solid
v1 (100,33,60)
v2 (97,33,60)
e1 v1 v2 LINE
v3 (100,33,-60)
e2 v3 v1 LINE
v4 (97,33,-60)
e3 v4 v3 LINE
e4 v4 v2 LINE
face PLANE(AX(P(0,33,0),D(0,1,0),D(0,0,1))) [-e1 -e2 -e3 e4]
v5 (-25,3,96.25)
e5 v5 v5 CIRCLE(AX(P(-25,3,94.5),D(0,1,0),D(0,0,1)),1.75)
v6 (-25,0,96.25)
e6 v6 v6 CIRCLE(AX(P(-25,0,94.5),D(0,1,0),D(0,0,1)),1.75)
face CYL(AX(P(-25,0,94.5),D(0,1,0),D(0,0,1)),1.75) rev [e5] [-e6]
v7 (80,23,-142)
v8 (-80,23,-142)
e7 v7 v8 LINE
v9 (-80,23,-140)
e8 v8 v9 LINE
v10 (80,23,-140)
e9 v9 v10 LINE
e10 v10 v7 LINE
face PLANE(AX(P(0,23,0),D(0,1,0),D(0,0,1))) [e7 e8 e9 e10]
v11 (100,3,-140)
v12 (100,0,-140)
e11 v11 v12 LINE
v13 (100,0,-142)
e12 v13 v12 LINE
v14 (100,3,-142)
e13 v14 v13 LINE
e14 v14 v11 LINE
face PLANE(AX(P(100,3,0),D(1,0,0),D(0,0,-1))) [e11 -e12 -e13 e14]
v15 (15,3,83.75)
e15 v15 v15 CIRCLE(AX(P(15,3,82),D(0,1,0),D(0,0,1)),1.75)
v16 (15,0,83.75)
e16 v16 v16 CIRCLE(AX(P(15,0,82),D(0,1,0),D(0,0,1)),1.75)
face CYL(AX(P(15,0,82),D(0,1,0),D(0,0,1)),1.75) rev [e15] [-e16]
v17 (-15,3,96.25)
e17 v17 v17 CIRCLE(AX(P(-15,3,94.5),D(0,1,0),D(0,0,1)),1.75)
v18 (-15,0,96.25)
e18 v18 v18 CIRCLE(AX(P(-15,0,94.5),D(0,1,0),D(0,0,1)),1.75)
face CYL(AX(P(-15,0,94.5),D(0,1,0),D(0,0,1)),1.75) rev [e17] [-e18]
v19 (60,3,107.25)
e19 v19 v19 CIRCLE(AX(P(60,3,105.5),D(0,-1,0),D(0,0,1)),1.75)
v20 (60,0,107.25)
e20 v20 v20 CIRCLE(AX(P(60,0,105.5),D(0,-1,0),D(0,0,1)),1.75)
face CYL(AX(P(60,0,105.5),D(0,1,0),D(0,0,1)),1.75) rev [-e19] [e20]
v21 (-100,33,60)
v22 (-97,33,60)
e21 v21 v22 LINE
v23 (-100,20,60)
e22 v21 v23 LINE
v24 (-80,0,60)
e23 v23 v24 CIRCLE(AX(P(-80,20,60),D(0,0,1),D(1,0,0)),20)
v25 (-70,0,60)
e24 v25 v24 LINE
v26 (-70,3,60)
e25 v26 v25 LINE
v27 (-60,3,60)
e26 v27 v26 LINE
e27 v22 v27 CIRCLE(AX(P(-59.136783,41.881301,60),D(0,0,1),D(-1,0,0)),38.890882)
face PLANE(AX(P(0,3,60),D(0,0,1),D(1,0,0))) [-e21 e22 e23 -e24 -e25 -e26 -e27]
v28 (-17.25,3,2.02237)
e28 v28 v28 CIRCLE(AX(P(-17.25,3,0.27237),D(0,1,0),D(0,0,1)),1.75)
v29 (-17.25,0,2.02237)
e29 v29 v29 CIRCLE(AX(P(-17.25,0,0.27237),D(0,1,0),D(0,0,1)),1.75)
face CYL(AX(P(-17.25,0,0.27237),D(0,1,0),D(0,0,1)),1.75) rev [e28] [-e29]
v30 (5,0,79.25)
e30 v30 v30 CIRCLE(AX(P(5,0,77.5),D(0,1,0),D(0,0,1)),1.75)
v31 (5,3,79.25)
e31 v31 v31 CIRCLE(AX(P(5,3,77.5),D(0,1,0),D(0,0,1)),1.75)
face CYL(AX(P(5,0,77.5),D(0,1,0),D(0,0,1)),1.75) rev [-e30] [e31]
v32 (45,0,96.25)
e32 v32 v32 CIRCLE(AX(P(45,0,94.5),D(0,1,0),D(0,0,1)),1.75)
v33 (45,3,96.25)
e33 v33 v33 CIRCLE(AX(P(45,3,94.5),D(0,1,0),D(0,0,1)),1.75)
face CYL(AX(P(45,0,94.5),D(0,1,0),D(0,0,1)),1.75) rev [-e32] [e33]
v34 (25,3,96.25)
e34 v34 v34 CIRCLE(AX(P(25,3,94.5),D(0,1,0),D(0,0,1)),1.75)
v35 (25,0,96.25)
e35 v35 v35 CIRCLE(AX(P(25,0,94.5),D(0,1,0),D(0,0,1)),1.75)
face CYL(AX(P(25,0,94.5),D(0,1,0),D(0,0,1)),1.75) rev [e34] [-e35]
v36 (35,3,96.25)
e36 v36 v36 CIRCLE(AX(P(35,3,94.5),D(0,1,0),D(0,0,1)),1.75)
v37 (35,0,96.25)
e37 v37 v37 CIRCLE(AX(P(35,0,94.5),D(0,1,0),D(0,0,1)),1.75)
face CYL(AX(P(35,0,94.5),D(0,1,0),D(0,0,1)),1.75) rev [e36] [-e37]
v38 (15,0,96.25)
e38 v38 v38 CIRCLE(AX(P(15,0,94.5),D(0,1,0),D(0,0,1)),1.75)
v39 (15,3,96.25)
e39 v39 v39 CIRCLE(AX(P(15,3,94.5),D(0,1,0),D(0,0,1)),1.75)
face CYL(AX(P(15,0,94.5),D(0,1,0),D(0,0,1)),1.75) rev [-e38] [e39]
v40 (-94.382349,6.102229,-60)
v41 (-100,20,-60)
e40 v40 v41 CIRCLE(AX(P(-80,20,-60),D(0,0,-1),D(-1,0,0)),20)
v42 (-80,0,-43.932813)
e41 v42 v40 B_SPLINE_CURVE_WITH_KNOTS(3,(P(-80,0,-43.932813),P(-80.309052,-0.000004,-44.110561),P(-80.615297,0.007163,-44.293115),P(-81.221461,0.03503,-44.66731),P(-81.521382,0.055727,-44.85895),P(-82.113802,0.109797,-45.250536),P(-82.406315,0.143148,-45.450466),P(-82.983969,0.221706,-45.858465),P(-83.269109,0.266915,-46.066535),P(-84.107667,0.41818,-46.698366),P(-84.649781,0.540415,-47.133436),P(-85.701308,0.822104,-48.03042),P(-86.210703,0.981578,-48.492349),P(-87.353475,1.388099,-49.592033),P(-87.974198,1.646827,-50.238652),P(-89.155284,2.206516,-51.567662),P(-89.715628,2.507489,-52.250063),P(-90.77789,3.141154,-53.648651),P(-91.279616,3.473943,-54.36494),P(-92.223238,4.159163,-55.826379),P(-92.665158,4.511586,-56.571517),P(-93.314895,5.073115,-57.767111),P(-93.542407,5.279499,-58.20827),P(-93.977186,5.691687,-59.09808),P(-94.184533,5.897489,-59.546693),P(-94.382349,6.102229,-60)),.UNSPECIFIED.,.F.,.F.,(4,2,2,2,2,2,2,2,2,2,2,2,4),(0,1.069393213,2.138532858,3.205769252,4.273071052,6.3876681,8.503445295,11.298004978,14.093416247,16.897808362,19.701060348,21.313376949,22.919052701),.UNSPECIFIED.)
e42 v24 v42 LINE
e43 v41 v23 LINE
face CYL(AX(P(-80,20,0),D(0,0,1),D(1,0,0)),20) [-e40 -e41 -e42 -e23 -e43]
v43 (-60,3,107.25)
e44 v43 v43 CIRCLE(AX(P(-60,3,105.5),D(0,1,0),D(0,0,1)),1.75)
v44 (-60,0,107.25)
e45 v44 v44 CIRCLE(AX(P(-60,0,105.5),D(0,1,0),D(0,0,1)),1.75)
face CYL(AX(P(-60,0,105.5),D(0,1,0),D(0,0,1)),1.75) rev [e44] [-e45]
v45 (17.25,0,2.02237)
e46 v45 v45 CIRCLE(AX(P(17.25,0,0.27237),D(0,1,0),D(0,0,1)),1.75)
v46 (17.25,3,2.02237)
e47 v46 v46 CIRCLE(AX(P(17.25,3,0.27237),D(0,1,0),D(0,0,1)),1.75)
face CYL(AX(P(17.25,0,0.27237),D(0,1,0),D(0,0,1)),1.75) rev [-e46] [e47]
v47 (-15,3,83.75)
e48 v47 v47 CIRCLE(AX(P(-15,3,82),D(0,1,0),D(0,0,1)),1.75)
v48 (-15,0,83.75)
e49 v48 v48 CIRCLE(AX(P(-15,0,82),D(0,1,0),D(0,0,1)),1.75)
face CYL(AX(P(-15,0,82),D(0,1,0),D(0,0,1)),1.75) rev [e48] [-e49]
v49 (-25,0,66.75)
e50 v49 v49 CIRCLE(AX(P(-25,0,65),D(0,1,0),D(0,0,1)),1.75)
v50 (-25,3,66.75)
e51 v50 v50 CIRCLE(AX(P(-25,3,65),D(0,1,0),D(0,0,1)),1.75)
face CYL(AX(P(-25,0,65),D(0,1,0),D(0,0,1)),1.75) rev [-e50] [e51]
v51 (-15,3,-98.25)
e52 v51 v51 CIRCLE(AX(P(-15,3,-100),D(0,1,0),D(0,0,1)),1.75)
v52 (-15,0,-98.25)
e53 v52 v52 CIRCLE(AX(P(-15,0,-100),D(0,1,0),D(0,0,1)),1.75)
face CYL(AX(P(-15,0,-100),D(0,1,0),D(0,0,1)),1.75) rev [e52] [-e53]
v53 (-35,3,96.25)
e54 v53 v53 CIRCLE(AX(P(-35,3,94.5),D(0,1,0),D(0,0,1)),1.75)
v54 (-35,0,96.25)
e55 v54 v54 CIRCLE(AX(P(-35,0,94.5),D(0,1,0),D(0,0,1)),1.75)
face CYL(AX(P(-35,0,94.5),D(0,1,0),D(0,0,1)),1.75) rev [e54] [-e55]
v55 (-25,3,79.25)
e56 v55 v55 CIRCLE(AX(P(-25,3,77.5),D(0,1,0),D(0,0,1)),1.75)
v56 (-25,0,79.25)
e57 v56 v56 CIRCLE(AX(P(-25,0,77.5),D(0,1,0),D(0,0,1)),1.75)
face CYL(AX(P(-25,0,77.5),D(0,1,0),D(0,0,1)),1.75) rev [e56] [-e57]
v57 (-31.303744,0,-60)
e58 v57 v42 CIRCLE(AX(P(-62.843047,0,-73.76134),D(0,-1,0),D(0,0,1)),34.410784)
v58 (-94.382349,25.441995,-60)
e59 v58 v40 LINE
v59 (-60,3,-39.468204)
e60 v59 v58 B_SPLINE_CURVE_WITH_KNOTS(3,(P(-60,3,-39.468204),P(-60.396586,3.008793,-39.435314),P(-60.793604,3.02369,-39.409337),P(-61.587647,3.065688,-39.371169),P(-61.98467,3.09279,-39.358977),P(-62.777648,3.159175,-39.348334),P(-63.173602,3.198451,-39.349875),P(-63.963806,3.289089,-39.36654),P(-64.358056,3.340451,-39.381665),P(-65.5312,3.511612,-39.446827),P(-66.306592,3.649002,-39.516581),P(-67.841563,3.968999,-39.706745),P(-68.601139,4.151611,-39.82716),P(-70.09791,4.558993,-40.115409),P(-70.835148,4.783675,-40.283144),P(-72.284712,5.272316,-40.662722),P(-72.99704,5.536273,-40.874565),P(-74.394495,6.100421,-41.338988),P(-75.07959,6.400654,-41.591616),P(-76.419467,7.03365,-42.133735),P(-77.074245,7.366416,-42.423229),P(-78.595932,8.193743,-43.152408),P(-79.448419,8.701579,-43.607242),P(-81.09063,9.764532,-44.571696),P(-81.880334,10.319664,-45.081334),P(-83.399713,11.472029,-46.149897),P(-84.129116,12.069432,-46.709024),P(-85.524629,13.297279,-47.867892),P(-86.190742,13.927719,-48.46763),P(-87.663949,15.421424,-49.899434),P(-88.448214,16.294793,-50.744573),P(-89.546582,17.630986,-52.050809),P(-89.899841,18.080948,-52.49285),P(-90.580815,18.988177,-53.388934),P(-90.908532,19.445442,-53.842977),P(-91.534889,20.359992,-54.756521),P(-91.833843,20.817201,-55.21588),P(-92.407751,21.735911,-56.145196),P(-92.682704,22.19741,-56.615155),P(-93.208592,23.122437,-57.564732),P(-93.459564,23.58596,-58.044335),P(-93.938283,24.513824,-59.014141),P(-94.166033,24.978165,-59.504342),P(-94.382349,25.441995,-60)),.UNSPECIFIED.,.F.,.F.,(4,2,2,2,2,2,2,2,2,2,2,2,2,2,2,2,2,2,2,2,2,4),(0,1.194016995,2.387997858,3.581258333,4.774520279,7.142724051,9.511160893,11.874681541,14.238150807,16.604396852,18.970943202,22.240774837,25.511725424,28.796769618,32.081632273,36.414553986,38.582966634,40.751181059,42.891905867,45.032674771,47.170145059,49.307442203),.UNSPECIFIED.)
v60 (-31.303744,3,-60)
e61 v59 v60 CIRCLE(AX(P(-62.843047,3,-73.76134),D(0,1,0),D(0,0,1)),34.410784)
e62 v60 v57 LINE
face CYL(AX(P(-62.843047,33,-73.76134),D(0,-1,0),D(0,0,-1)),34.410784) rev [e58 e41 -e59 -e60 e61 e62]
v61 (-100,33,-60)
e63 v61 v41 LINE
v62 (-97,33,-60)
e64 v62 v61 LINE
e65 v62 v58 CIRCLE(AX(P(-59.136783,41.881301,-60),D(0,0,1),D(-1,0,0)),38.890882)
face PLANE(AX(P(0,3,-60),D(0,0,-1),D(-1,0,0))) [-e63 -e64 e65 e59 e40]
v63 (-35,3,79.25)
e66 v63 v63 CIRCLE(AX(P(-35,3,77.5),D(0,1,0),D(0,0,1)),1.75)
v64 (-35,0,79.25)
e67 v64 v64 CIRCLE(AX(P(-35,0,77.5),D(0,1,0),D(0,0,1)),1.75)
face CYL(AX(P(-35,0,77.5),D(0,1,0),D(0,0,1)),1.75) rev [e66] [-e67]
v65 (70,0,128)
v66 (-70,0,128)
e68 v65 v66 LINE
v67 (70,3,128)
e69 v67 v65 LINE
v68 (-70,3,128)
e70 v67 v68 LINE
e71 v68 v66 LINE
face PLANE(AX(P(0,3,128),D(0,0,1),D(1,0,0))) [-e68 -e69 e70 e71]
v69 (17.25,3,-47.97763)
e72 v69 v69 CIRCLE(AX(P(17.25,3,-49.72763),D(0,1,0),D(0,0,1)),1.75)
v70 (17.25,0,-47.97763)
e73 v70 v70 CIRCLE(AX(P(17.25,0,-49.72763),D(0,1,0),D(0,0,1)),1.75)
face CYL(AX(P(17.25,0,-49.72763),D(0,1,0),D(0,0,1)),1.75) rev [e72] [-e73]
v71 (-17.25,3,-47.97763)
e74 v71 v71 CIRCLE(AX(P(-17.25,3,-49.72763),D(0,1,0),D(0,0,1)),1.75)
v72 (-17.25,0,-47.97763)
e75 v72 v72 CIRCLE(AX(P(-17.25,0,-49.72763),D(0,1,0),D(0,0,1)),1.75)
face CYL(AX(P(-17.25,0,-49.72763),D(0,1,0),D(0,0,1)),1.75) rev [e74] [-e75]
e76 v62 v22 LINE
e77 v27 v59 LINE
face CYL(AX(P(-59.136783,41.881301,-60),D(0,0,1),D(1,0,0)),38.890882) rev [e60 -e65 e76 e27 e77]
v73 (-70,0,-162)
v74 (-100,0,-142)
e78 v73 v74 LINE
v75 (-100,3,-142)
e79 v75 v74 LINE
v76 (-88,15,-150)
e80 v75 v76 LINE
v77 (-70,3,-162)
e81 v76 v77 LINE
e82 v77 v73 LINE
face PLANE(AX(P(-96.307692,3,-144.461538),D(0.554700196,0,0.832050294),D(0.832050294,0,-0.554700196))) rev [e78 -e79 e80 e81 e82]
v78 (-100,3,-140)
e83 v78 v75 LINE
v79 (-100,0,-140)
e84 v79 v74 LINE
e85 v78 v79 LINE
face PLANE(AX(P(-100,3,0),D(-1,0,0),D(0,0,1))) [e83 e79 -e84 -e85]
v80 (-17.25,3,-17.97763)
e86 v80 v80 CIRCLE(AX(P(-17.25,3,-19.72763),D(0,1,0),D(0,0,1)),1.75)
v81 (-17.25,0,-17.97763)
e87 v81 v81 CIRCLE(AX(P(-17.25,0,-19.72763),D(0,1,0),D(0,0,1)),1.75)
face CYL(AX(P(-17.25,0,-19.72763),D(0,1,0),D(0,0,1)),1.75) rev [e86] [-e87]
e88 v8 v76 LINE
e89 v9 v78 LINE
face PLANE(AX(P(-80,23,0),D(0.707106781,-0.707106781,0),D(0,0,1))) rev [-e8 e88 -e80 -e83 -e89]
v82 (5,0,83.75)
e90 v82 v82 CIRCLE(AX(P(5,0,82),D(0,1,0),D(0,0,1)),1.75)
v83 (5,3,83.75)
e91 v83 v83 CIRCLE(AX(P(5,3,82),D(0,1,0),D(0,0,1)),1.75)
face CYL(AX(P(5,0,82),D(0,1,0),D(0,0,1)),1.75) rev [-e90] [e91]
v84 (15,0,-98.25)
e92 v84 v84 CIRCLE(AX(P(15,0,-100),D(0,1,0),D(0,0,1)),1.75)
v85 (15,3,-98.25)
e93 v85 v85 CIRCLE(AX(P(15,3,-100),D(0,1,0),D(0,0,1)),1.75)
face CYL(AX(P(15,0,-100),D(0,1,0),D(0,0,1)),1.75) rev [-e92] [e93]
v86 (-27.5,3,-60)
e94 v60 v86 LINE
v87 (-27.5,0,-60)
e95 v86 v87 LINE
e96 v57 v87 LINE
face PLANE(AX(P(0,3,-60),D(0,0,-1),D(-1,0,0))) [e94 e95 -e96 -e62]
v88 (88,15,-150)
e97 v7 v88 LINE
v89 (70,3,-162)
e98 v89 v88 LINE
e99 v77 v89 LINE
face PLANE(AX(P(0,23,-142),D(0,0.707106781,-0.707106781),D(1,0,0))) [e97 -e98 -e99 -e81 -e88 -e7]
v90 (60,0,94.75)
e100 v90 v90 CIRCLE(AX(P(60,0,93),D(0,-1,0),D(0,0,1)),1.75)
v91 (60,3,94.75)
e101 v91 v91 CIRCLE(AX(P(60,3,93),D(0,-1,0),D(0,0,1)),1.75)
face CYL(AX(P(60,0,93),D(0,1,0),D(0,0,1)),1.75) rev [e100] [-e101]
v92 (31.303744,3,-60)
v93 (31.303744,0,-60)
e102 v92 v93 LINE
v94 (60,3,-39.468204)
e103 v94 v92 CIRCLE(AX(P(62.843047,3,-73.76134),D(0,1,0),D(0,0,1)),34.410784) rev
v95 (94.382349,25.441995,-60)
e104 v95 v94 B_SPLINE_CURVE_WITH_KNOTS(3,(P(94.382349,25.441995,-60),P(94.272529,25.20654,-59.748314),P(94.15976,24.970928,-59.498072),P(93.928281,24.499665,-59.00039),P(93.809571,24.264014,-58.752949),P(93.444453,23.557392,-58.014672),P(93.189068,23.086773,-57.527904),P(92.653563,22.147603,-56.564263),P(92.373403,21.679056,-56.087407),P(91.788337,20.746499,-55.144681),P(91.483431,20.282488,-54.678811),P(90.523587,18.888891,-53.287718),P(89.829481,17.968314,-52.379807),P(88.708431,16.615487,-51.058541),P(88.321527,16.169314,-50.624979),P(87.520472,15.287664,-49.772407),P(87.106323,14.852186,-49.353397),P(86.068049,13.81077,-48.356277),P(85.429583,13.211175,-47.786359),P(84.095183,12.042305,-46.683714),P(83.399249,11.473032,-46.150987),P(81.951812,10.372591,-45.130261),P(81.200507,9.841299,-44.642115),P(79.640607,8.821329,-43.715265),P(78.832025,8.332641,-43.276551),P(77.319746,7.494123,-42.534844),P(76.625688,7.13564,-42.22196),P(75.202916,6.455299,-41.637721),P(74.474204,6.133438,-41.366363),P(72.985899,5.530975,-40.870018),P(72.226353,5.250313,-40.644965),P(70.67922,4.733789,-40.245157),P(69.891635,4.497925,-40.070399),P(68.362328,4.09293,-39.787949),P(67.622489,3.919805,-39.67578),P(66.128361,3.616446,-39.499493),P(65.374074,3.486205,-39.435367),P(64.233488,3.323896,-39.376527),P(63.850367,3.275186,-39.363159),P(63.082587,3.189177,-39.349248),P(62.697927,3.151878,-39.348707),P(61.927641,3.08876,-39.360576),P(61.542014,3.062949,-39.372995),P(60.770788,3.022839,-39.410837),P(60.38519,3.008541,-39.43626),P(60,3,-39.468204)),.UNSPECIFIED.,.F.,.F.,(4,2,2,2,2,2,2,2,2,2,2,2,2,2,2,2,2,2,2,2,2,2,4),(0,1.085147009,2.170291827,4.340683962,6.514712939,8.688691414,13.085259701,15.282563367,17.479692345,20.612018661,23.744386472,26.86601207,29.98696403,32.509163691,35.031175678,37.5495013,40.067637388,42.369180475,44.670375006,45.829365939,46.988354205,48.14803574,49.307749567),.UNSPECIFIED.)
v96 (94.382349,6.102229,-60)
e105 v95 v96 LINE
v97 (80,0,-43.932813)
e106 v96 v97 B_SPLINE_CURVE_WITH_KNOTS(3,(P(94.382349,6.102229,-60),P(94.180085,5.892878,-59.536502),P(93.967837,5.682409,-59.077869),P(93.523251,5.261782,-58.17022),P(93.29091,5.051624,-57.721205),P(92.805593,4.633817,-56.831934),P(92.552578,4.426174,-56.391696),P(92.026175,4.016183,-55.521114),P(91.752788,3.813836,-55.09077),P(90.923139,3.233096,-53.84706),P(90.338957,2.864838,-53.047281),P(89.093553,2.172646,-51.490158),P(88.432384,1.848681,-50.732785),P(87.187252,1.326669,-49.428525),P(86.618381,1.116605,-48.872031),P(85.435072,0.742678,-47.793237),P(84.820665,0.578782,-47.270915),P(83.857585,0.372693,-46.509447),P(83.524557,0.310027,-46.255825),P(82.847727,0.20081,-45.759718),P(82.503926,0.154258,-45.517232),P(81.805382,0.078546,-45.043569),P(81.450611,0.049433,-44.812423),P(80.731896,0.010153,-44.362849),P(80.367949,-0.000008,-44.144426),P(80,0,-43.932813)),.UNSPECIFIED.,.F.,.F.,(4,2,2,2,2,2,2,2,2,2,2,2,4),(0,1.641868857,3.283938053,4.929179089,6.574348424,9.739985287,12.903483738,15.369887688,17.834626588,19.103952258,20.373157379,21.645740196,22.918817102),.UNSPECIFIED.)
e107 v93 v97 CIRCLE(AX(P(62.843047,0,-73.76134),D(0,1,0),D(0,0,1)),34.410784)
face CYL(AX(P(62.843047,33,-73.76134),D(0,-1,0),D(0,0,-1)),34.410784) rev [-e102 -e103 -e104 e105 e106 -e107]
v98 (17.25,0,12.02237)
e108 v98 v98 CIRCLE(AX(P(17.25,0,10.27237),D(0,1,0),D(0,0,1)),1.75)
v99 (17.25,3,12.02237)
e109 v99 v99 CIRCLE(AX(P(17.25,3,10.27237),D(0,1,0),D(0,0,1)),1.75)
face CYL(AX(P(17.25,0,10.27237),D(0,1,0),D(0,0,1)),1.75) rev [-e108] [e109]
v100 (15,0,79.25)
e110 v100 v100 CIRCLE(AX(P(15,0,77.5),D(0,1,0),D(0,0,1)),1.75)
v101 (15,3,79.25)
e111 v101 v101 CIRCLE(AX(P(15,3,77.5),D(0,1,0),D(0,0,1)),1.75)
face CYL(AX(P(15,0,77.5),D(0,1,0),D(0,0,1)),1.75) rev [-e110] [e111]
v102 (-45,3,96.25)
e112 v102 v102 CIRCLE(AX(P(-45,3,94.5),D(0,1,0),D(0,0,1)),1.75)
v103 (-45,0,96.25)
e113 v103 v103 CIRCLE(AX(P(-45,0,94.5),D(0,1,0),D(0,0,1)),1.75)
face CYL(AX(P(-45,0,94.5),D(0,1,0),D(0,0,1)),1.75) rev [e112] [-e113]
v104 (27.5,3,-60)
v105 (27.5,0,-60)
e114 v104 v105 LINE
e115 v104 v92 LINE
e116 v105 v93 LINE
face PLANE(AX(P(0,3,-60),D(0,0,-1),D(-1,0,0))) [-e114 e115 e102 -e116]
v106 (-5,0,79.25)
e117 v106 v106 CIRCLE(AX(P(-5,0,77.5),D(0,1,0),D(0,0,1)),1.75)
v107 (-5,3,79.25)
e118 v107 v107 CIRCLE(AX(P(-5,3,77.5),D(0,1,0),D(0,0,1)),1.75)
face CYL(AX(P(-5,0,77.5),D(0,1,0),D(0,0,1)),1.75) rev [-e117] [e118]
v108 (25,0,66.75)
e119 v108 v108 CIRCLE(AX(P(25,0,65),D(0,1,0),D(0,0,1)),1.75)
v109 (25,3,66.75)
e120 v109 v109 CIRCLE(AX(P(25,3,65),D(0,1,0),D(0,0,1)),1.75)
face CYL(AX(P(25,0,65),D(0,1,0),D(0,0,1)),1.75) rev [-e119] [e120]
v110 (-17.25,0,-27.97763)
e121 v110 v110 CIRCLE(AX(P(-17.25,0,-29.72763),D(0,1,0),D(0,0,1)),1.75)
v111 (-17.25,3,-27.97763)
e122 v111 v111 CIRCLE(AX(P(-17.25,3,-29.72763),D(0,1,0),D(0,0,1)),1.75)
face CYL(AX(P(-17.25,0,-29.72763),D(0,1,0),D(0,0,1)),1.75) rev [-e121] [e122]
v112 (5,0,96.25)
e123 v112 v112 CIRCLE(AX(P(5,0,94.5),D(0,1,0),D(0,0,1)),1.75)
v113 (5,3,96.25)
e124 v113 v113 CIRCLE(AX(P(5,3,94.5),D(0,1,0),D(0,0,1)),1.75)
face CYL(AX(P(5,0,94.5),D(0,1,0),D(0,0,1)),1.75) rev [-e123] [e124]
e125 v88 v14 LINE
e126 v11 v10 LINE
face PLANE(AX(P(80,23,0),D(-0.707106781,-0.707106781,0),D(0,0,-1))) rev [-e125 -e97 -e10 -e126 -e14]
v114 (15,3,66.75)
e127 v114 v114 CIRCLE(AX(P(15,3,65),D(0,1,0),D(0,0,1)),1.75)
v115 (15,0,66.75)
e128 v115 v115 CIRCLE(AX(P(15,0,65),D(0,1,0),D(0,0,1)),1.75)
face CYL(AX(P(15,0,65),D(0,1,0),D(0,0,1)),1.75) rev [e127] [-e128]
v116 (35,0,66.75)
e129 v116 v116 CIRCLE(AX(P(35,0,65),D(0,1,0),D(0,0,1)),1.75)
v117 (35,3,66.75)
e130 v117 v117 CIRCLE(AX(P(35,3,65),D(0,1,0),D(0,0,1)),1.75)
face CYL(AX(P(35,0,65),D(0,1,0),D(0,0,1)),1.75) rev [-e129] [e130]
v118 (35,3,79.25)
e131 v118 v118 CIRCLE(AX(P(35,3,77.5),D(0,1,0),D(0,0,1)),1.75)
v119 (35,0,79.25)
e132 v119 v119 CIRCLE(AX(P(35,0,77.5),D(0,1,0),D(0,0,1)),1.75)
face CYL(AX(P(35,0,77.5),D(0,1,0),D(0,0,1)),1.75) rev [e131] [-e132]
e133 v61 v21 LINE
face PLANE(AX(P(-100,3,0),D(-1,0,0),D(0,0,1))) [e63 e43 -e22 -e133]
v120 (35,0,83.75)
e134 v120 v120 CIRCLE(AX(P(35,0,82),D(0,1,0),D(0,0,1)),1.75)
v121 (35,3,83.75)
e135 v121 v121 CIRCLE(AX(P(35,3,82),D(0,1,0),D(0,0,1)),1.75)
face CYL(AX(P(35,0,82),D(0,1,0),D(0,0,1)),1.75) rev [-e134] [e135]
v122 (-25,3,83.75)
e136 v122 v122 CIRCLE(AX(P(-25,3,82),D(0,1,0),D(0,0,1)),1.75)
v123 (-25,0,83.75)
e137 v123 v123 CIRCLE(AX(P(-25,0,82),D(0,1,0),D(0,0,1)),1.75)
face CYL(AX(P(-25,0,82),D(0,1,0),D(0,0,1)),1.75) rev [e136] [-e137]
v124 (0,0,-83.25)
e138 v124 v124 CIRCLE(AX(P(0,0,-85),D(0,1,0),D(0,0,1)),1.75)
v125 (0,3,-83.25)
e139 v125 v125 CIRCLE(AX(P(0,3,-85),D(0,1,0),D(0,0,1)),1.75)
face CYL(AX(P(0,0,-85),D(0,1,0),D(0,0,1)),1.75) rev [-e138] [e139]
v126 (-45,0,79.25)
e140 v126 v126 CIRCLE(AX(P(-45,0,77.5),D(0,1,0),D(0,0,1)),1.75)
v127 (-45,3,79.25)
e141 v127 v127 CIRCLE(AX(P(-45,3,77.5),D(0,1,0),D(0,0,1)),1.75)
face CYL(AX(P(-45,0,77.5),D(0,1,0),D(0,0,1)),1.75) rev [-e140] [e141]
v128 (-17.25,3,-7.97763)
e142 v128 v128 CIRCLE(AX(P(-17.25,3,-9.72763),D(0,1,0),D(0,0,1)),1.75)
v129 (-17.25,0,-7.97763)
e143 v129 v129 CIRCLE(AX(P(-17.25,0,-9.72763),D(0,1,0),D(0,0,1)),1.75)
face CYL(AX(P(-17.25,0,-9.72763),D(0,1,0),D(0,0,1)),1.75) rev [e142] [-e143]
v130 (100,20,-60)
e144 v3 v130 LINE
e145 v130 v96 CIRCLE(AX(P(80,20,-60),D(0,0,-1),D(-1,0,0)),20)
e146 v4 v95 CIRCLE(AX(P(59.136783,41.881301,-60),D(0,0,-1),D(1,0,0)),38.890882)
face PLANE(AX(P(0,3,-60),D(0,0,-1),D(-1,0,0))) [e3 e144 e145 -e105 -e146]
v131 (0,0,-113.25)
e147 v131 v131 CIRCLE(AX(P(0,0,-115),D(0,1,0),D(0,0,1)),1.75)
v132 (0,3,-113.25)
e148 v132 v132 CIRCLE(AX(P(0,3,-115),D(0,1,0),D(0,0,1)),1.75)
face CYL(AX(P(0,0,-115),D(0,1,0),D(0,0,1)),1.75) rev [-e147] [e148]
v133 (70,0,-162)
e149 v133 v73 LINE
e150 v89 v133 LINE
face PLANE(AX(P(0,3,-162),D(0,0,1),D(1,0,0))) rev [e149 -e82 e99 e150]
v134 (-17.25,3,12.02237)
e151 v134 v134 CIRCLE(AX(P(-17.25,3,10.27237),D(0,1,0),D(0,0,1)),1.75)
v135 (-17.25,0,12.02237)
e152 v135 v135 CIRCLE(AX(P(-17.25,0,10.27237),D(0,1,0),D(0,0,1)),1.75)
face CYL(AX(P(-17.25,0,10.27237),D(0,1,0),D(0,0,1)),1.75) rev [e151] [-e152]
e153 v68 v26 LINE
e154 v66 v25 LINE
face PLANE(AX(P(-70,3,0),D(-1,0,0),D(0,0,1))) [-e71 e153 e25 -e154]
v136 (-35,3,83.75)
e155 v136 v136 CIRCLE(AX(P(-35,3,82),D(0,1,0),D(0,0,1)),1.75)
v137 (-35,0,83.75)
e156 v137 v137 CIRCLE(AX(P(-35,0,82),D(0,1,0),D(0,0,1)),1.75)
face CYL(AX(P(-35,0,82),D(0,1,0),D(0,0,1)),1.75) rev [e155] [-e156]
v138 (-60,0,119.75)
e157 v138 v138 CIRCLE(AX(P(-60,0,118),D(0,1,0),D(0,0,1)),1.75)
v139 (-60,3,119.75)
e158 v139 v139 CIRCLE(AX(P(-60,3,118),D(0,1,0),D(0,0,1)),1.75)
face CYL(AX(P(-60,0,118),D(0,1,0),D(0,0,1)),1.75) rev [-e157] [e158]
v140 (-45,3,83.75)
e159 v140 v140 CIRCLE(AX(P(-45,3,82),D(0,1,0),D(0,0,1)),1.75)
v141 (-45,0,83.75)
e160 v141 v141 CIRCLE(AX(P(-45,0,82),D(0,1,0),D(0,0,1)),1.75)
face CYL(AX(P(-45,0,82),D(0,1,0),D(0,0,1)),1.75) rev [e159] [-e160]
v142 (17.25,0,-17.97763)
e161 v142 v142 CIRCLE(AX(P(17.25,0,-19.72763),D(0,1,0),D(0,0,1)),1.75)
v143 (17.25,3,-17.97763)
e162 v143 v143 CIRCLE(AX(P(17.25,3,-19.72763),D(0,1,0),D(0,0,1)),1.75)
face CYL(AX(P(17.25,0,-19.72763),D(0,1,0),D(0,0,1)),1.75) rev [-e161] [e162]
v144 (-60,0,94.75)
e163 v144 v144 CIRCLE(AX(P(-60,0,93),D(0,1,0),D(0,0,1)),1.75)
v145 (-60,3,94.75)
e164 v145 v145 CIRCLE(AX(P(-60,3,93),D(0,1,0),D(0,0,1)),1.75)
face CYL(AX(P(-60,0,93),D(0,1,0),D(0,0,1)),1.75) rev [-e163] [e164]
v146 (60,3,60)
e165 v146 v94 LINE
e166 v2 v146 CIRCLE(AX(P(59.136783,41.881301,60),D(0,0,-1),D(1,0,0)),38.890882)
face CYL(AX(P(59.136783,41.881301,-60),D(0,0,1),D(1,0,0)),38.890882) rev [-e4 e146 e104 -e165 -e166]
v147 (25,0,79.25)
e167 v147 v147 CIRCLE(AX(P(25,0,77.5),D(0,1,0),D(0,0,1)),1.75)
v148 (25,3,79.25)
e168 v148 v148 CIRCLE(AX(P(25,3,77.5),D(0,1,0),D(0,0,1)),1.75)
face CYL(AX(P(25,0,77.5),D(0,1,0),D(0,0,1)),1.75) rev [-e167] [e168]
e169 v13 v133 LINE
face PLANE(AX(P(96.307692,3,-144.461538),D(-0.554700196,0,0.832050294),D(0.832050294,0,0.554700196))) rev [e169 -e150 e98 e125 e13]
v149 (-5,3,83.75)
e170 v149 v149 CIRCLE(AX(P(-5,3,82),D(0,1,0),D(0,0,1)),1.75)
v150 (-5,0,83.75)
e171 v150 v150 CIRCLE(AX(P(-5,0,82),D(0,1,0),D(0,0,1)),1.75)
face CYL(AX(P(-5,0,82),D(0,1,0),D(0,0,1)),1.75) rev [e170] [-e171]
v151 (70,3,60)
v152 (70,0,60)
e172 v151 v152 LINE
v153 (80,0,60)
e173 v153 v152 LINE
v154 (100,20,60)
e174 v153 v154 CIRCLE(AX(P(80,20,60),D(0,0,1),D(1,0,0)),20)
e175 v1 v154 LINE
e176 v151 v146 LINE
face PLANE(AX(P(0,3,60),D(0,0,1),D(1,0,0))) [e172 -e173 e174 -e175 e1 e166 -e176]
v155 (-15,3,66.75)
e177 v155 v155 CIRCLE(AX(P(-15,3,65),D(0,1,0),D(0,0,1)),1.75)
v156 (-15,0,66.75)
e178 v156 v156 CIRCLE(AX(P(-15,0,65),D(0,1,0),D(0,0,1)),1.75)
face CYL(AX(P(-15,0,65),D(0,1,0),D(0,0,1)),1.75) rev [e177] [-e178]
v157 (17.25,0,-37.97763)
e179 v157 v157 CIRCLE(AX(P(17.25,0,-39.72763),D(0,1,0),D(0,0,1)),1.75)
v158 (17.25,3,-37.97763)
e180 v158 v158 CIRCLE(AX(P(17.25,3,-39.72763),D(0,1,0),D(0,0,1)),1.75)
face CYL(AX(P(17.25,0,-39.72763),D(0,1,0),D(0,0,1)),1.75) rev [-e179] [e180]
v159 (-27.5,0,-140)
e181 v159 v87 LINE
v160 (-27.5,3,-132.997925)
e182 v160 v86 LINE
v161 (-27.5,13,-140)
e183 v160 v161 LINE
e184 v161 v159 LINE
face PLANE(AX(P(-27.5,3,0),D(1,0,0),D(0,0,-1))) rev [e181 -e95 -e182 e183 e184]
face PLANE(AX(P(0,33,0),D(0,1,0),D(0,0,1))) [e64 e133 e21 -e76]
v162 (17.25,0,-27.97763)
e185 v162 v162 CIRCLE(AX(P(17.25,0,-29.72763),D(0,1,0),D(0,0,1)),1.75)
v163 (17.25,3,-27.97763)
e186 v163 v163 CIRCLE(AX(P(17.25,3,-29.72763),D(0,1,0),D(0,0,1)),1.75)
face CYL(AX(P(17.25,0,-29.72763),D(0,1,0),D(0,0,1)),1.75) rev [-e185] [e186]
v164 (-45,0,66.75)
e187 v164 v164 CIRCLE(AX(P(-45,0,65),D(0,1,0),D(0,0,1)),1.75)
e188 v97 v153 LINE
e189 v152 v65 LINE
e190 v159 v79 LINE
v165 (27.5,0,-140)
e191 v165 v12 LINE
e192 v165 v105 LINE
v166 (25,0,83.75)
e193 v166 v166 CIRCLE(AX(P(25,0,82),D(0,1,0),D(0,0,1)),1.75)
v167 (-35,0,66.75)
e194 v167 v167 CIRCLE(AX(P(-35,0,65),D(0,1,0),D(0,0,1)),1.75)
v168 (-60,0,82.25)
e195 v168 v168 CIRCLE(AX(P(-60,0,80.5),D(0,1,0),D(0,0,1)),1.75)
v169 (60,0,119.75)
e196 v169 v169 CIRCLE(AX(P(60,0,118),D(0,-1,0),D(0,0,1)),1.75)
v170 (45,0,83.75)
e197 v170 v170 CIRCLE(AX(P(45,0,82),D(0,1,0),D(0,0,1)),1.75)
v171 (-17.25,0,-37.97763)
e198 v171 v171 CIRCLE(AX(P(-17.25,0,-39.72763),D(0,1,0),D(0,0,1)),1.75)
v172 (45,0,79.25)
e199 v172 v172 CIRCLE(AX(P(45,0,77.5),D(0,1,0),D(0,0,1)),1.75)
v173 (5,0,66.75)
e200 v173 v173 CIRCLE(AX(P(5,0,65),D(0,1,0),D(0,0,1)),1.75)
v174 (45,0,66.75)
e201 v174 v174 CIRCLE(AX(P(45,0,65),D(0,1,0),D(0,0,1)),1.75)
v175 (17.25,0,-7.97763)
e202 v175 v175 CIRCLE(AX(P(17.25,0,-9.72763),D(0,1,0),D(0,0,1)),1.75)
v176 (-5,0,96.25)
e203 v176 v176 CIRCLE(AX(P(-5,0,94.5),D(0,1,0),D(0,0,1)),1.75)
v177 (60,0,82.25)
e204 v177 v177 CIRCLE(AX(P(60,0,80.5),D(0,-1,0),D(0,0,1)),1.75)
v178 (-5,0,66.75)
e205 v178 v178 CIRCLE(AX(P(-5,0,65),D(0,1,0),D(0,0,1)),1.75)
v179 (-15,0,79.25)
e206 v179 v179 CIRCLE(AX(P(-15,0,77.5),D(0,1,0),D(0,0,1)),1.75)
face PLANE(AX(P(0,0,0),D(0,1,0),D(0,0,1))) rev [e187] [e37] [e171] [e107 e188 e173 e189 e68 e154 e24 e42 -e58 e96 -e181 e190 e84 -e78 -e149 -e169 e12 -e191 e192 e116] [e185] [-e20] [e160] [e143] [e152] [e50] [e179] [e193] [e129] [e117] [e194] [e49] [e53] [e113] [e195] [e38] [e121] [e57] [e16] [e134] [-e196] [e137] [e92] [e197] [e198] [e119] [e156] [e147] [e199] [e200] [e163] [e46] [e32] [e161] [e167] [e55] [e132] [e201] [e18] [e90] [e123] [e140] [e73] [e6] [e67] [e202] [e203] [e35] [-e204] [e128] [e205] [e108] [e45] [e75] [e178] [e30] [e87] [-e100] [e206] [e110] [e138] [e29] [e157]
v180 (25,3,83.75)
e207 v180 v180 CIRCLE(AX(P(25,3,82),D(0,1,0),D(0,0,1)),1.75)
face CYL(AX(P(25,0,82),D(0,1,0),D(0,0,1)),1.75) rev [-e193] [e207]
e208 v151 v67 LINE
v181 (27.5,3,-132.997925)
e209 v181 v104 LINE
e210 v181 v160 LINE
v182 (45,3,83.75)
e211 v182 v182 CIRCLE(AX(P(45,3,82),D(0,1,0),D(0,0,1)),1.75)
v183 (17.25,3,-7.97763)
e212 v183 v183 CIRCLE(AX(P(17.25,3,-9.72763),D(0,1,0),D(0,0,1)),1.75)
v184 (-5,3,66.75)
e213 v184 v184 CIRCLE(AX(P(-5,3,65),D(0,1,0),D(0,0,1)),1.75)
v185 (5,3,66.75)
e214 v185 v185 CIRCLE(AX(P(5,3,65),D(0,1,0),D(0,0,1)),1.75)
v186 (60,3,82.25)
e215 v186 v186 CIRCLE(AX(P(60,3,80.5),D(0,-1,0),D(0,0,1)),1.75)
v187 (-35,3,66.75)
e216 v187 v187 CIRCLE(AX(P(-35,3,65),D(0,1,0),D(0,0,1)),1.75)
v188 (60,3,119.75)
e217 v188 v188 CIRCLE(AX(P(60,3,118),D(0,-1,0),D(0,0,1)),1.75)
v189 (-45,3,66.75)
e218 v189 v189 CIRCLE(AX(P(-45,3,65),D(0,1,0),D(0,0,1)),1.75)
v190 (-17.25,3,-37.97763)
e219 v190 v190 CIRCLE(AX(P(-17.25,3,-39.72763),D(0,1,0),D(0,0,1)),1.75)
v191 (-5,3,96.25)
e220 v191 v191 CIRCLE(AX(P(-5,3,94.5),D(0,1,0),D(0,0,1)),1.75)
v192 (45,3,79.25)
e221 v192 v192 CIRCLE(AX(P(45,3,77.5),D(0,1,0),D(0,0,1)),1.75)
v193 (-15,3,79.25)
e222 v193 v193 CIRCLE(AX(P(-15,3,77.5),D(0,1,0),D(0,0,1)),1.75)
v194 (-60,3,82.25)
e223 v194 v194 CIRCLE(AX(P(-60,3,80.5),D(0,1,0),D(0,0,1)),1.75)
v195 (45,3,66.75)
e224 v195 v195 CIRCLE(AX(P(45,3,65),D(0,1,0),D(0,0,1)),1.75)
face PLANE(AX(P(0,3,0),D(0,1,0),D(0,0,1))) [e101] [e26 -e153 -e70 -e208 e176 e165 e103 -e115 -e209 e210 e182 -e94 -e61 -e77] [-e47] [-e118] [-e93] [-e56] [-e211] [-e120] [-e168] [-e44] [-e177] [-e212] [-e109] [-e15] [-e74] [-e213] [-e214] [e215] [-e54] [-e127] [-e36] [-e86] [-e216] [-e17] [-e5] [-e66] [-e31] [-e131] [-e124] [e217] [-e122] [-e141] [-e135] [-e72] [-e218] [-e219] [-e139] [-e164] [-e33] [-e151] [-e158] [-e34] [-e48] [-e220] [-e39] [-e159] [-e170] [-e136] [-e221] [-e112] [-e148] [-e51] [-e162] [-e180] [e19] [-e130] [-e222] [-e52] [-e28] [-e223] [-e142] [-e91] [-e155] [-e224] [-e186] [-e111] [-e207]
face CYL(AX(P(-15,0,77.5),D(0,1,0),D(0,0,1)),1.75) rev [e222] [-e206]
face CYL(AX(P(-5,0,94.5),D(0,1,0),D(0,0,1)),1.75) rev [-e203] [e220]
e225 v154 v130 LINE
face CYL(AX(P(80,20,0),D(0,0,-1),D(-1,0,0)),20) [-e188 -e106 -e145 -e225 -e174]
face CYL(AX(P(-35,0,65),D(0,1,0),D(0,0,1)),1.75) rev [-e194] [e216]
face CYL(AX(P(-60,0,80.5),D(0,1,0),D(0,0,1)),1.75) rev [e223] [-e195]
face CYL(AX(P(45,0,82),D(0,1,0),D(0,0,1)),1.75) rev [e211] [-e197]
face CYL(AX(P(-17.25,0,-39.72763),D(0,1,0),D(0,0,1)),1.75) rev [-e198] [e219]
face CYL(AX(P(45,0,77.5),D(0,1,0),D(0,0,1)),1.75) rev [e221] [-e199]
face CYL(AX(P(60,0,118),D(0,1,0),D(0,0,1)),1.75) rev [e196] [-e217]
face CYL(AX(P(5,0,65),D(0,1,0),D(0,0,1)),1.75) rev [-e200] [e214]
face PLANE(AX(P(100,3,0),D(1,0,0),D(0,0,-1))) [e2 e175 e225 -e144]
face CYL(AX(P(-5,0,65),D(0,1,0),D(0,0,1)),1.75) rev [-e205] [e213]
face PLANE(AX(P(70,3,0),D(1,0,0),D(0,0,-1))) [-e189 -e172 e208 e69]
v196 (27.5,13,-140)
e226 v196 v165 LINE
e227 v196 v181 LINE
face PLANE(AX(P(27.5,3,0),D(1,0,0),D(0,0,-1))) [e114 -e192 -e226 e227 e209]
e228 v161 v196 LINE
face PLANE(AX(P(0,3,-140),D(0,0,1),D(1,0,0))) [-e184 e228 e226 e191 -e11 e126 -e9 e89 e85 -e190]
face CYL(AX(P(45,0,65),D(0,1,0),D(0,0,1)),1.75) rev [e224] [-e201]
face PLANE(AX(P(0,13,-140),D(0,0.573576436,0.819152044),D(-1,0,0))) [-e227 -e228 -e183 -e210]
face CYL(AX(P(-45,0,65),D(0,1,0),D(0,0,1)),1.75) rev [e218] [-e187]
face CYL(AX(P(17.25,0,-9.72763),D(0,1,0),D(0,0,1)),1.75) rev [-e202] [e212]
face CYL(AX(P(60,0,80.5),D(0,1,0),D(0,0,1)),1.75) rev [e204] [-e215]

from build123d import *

# Parameters (mm, degrees)
BOSS_EXTRUDE1_DEPTH       = 3
BOSS_EXTRUDE2_DEPTH       = 20
CHAMFER1_SIZE             = 20
SKETCH9_R                 = 1.75
CUT_EXTRUDE6_DEPTH        = 192.426225998
CHAMFER2_SIZE             = 10
CHAMFER2_SIZE2            = 7.002075382
SKETCH12_W                = 40
SKETCH12_H                = 120
BOSS_EXTRUDE3_DEPTH       = 30
CUT_EXTRUDE8_DEPTH        = 120
CUT_EXTRUDE9_DEPTH        = 194.217494032
FILLET2_R                 = 20
SKETCH16_R                = 1.75
CUT_EXTRUDE10_DEPTH       = 193.727787374
LPATTERN1_COUNT           = 7
LPATTERN1_PITCH           = 10
SKETCH17_R                = 1.75
CUT_EXTRUDE11_DEPTH       = 193.727787374
LPATTERN2_COUNT           = 2
LPATTERN2_PITCH           = 12.5
MIRROR4_COPY_1_SKETCH_R   = 1.75
MIRROR4_COPY_1_DEPTH      = 193.727787374
SKETCH18_R                = 1.75
CUT_EXTRUDE12_DEPTH       = 193.727787374
LPATTERN3_COUNT           = 10
LPATTERN3_PITCH           = 10
LPATTERN4_COUNT           = 2
LPATTERN4_PITCH           = 12.5
LPATTERN4_COPY_1_SKETCH_R = 1.75
LPATTERN4_COPY_1_DEPTH    = 193.727787374
LPATTERN4_COPY_2_SKETCH_R = 1.75
LPATTERN4_COPY_2_DEPTH    = 193.727787374
LPATTERN4_COPY_3_SKETCH_R = 1.75
LPATTERN4_COPY_3_DEPTH    = 193.727787374
LPATTERN4_COPY_4_SKETCH_R = 1.75
LPATTERN4_COPY_4_DEPTH    = 193.727787374
LPATTERN4_COPY_5_SKETCH_R = 1.75
LPATTERN4_COPY_5_DEPTH    = 193.727787374
LPATTERN4_COPY_6_SKETCH_R = 1.75
LPATTERN4_COPY_6_DEPTH    = 193.727787374
LPATTERN4_COPY_7_SKETCH_R = 1.75
LPATTERN4_COPY_7_DEPTH    = 193.727787374
LPATTERN4_COPY_8_SKETCH_R = 1.75
LPATTERN4_COPY_8_DEPTH    = 193.727787374
LPATTERN4_COPY_9_SKETCH_R = 1.75
LPATTERN4_COPY_9_DEPTH    = 193.727787374


with BuildPart() as part:
    # Sketch1 → Boss-Extrude1 (new body)
    with BuildSketch(Plane(origin=(0, 0, 0), x_dir=(1, 0, 0), z_dir=(0, 1, 0))):
        Polygon((100, 60), (100, -60), (70, -60), (70, -128), (-70, -128), (-70, -60), (-100, -60), (-100, 60), (-27.5, 60), (-27.5, 140), (-100, 140), (-100, 142), (-70, 162), (70, 162), (100, 142), (100, 140), (27.5, 140), (27.5, 60), align=None)
    extrude(amount=BOSS_EXTRUDE1_DEPTH)

    # Sketch8 → Boss-Extrude2 (add)
    with BuildSketch(Plane(origin=(0, 3, 0), x_dir=(1, 0, 0), z_dir=(0, 1, 0))):
        Polygon((-100, 140), (100, 140), (100, 142), (70, 162), (-70, 162), (-100, 142), align=None)
    extrude(amount=BOSS_EXTRUDE2_DEPTH)

    # Chamfer1
    # the kernel refuses this chamfer: 20 mm, written as the material it takes off along each edge
    with BuildSketch(Plane(origin=(121.433659759, 23, -162), x_dir=(0, -0.9996219169112968, -0.027495876610586317), z_dir=(-1, 0, 0))) as chamfer1_piece_1:
        Polygon((CHAMFER1_SIZE * 0.999621916911, CHAMFER1_SIZE * 0.0274958766106), (-CHAMFER1_SIZE * 0.0274958766106, CHAMFER1_SIZE * 0.999621916911), (0, 0), align=None)
    extrude(amount=242.867319519, mode=Mode.SUBTRACT)
    with BuildSketch(Plane(origin=(-100, 23, -193.433659759), x_dir=(-0.027495876610586317, -0.9996219169112968, 0), z_dir=(0, 0, 1))) as chamfer1_piece_2:
        Polygon((CHAMFER1_SIZE * 0.999621916911, CHAMFER1_SIZE * 0.0274958766106), (-CHAMFER1_SIZE * 0.0274958766106, CHAMFER1_SIZE * 0.999621916911), (0, 0), align=None)
    extrude(amount=104.867319519, mode=Mode.SUBTRACT)
    with BuildSketch(Plane(origin=(100, 23, -88.566340241), x_dir=(-0.9996219169112968, 0.027495876610586317, 0), z_dir=(0, 0, -1))) as chamfer1_piece_3:
        Polygon((CHAMFER1_SIZE * 0.999621916911, -CHAMFER1_SIZE * 0.0274958766106), (-CHAMFER1_SIZE * 0.0274958766106, -CHAMFER1_SIZE * 0.999621916911), (0, 0), align=None)
    extrude(amount=104.867319519, mode=Mode.SUBTRACT)

    # Sketch9 → Cut-Extrude6 (cut, through all)
    with BuildSketch(Plane(origin=(0, 3, 0), x_dir=(1, 0, 0), z_dir=(0, 1, 0))):
        with Locations(Location((-15, 100, 0), (0, 0, 270))):
            Circle(SKETCH9_R)
        with Locations(Location((15, 100, 0), (0, 0, 270))):
            Circle(SKETCH9_R)
        with Locations(Location((0, 115, 0), (0, 0, 270))):
            Circle(SKETCH9_R)
        with Locations(Location((0, 85, 0), (0, 0, 270))):
            Circle(SKETCH9_R)
    extrude(amount=-CUT_EXTRUDE6_DEPTH, mode=Mode.SUBTRACT)

    # Chamfer2
    chamfer2_edges = [part.edges().sort_by_distance(p)[0] for p in [
        (0, 3, -140),
    ]]
    chamfer2_side = [part.faces().sort_by_distance(p)[0] for p in [
        (0, 11.429781082, -140),
    ]]
    chamfer(chamfer2_edges, length=CHAMFER2_SIZE, length2=CHAMFER2_SIZE2, reference=chamfer2_side[0])

    # Sketch12 → Boss-Extrude3 (add)
    with BuildSketch(Plane(origin=(0, 3, 0), x_dir=(1, 0, 0), z_dir=(0, 1, 0))):
        with Locations((-80, 0)):
            Rectangle(SKETCH12_W, SKETCH12_H)
    boss_extrude3 = extrude(amount=BOSS_EXTRUDE3_DEPTH)

    # Sketch13 → Cut-Extrude8 (cut)
    with BuildSketch(Plane.XY.offset(60)):
        with BuildLine():
            Line((-97, 33), (-60, 33))
            Line((-60, 33), (-60, 3))
            ThreePointArc((-60, 3), (-83.63033668, 11.672584761), (-97, 33))
        make_face()
    cut_extrude8 = extrude(amount=-CUT_EXTRUDE8_DEPTH, mode=Mode.SUBTRACT)

    # Sketch14 → Cut-Extrude9 (cut, through all)
    with BuildSketch(Plane.XZ):
        with BuildLine():
            Line((-31.303743975, -60), (-94.382349042, -60))
            ThreePointArc((-94.382349042, -60), (-62.843046509, -39.350555542), (-31.303743975, -60))
        make_face()
    cut_extrude9 = extrude(amount=-CUT_EXTRUDE9_DEPTH, mode=Mode.SUBTRACT)

    # Mirror3: Boss-Extrude3, Cut-Extrude8, Cut-Extrude9 across plane
    add(boss_extrude3.mirror(Plane(origin=(0, 0, 0), x_dir=(0, 0, 1), z_dir=(1, 0, 0))))
    add(cut_extrude8.mirror(Plane(origin=(0, 0, 0), x_dir=(0, 0, 1), z_dir=(1, 0, 0))), mode=Mode.SUBTRACT)
    add(cut_extrude9.mirror(Plane(origin=(0, 0, 0), x_dir=(0, 0, 1), z_dir=(1, 0, 0))), mode=Mode.SUBTRACT)

    # Fillet2
    fillet2_edges = [part.edges().sort_by_distance(p)[0] for p in [
        (-100, 0, 0),
        (100, 0, 0),
    ]]
    fillet(fillet2_edges, radius=FILLET2_R)

    # Sketch16 → Cut-Extrude10 (cut, through all)
    with BuildSketch(Plane(origin=(0, 3, 0), x_dir=(1, 0, 0), z_dir=(0, 1, 0))):
        with Locations(Location((-17.25, 49.727630158, 0), (0, 0, 270))):
            Circle(SKETCH16_R)
        with Locations(Location((17.25, 49.727630158, 0), (0, 0, 270))):
            Circle(SKETCH16_R)
    cut_extrude10 = extrude(amount=-CUT_EXTRUDE10_DEPTH, mode=Mode.SUBTRACT)

    # LPattern1: Cut-Extrude10 ×7
    with Locations(*[(0, 0, i * LPATTERN1_PITCH) for i in range(1, LPATTERN1_COUNT)]):
        add(cut_extrude10, mode=Mode.SUBTRACT)

    # Sketch17 → Cut-Extrude11 (cut, through all)
    with BuildSketch(Plane(origin=(0, 3, 0), x_dir=(1, 0, 0), z_dir=(0, 1, 0))):
        with Locations(Location((-60, -118, 0), (0, 0, 270))):
            Circle(SKETCH17_R)
        with Locations(Location((-60, -93, 0), (0, 0, 270))):
            Circle(SKETCH17_R)
    cut_extrude11 = extrude(amount=-CUT_EXTRUDE11_DEPTH, mode=Mode.SUBTRACT)

    # LPattern2: Cut-Extrude11 ×2
    with Locations(*[(0, 0, -i * LPATTERN2_PITCH) for i in range(1, LPATTERN2_COUNT)]):
        add(cut_extrude11, mode=Mode.SUBTRACT)

    # Mirror4: Cut-Extrude11 across plane
    add(cut_extrude11.mirror(Plane(origin=(0, 0, 0), x_dir=(0, 0, 1), z_dir=(1, 0, 0))), mode=Mode.SUBTRACT)

    # Mirror4 copy 1 sketch → Mirror4 copy 1 (cut, through all)
    with BuildSketch(Plane(origin=(0, 3, -12.5), x_dir=(-1, 0, 0), z_dir=(0, 1, 0))):
        with Locations((-60, 118)):
            Circle(MIRROR4_COPY_1_SKETCH_R)
        with Locations((-60, 93)):
            Circle(MIRROR4_COPY_1_SKETCH_R)
    extrude(amount=-MIRROR4_COPY_1_DEPTH, mode=Mode.SUBTRACT)

    # Sketch18 → Cut-Extrude12 (cut, through all)
    with BuildSketch(Plane(origin=(0, 3, 0), x_dir=(1, 0, 0), z_dir=(0, 1, 0))):
        with Locations(Location((-45, -82, 0), (0, 0, 270))):
            Circle(SKETCH18_R)
        with Locations(Location((-45, -65, 0), (0, 0, 270))):
            Circle(SKETCH18_R)
    cut_extrude12 = extrude(amount=-CUT_EXTRUDE12_DEPTH, mode=Mode.SUBTRACT)

    # LPattern3: Cut-Extrude12 ×10
    with Locations(*[(i * LPATTERN3_PITCH, 0, 0) for i in range(1, LPATTERN3_COUNT)]):
        add(cut_extrude12, mode=Mode.SUBTRACT)

    # LPattern4: Cut-Extrude12 ×2
    with Locations(*[(0, 0, i * LPATTERN4_PITCH) for i in range(1, LPATTERN4_COUNT)]):
        add(cut_extrude12, mode=Mode.SUBTRACT)

    # LPattern4 copy 1 sketch → LPattern4 copy 1 (cut, through all)
    with BuildSketch(Plane(origin=(10, 3, 12.5), x_dir=(1, 0, 0), z_dir=(0, 1, 0))):
        with Locations(Location((-45, -82, 0), (0, 0, 270))):
            Circle(LPATTERN4_COPY_1_SKETCH_R)
        with Locations(Location((-45, -65, 0), (0, 0, 270))):
            Circle(LPATTERN4_COPY_1_SKETCH_R)
    extrude(amount=-LPATTERN4_COPY_1_DEPTH, mode=Mode.SUBTRACT)

    # LPattern4 copy 2 sketch → LPattern4 copy 2 (cut, through all)
    with BuildSketch(Plane(origin=(20, 3, 12.5), x_dir=(1, 0, 0), z_dir=(0, 1, 0))):
        with Locations(Location((-45, -82, 0), (0, 0, 270))):
            Circle(LPATTERN4_COPY_2_SKETCH_R)
        with Locations(Location((-45, -65, 0), (0, 0, 270))):
            Circle(LPATTERN4_COPY_2_SKETCH_R)
    extrude(amount=-LPATTERN4_COPY_2_DEPTH, mode=Mode.SUBTRACT)

    # LPattern4 copy 3 sketch → LPattern4 copy 3 (cut, through all)
    with BuildSketch(Plane(origin=(30, 3, 12.5), x_dir=(1, 0, 0), z_dir=(0, 1, 0))):
        with Locations(Location((-45, -82, 0), (0, 0, 270))):
            Circle(LPATTERN4_COPY_3_SKETCH_R)
        with Locations(Location((-45, -65, 0), (0, 0, 270))):
            Circle(LPATTERN4_COPY_3_SKETCH_R)
    extrude(amount=-LPATTERN4_COPY_3_DEPTH, mode=Mode.SUBTRACT)

    # LPattern4 copy 4 sketch → LPattern4 copy 4 (cut, through all)
    with BuildSketch(Plane(origin=(40, 3, 12.5), x_dir=(1, 0, 0), z_dir=(0, 1, 0))):
        with Locations(Location((-45, -82, 0), (0, 0, 270))):
            Circle(LPATTERN4_COPY_4_SKETCH_R)
        with Locations(Location((-45, -65, 0), (0, 0, 270))):
            Circle(LPATTERN4_COPY_4_SKETCH_R)
    extrude(amount=-LPATTERN4_COPY_4_DEPTH, mode=Mode.SUBTRACT)

    # LPattern4 copy 5 sketch → LPattern4 copy 5 (cut, through all)
    with BuildSketch(Plane(origin=(50, 3, 12.5), x_dir=(1, 0, 0), z_dir=(0, 1, 0))):
        with Locations(Location((-45, -82, 0), (0, 0, 270))):
            Circle(LPATTERN4_COPY_5_SKETCH_R)
        with Locations(Location((-45, -65, 0), (0, 0, 270))):
            Circle(LPATTERN4_COPY_5_SKETCH_R)
    extrude(amount=-LPATTERN4_COPY_5_DEPTH, mode=Mode.SUBTRACT)

    # LPattern4 copy 6 sketch → LPattern4 copy 6 (cut, through all)
    with BuildSketch(Plane(origin=(60, 3, 12.5), x_dir=(1, 0, 0), z_dir=(0, 1, 0))):
        with Locations(Location((-45, -82, 0), (0, 0, 270))):
            Circle(LPATTERN4_COPY_6_SKETCH_R)
        with Locations(Location((-45, -65, 0), (0, 0, 270))):
            Circle(LPATTERN4_COPY_6_SKETCH_R)
    extrude(amount=-LPATTERN4_COPY_6_DEPTH, mode=Mode.SUBTRACT)

    # LPattern4 copy 7 sketch → LPattern4 copy 7 (cut, through all)
    with BuildSketch(Plane(origin=(70, 3, 12.5), x_dir=(1, 0, 0), z_dir=(0, 1, 0))):
        with Locations(Location((-45, -82, 0), (0, 0, 270))):
            Circle(LPATTERN4_COPY_7_SKETCH_R)
        with Locations(Location((-45, -65, 0), (0, 0, 270))):
            Circle(LPATTERN4_COPY_7_SKETCH_R)
    extrude(amount=-LPATTERN4_COPY_7_DEPTH, mode=Mode.SUBTRACT)

    # LPattern4 copy 8 sketch → LPattern4 copy 8 (cut, through all)
    with BuildSketch(Plane(origin=(80, 3, 12.5), x_dir=(1, 0, 0), z_dir=(0, 1, 0))):
        with Locations(Location((-45, -82, 0), (0, 0, 270))):
            Circle(LPATTERN4_COPY_8_SKETCH_R)
        with Locations(Location((-45, -65, 0), (0, 0, 270))):
            Circle(LPATTERN4_COPY_8_SKETCH_R)
    extrude(amount=-LPATTERN4_COPY_8_DEPTH, mode=Mode.SUBTRACT)

    # LPattern4 copy 9 sketch → LPattern4 copy 9 (cut, through all)
    with BuildSketch(Plane(origin=(90, 3, 12.5), x_dir=(1, 0, 0), z_dir=(0, 1, 0))):
        with Locations(Location((-45, -82, 0), (0, 0, 270))):
            Circle(LPATTERN4_COPY_9_SKETCH_R)
        with Locations(Location((-45, -65, 0), (0, 0, 270))):
            Circle(LPATTERN4_COPY_9_SKETCH_R)
    extrude(amount=-LPATTERN4_COPY_9_DEPTH, mode=Mode.SUBTRACT)


solid = part.part
